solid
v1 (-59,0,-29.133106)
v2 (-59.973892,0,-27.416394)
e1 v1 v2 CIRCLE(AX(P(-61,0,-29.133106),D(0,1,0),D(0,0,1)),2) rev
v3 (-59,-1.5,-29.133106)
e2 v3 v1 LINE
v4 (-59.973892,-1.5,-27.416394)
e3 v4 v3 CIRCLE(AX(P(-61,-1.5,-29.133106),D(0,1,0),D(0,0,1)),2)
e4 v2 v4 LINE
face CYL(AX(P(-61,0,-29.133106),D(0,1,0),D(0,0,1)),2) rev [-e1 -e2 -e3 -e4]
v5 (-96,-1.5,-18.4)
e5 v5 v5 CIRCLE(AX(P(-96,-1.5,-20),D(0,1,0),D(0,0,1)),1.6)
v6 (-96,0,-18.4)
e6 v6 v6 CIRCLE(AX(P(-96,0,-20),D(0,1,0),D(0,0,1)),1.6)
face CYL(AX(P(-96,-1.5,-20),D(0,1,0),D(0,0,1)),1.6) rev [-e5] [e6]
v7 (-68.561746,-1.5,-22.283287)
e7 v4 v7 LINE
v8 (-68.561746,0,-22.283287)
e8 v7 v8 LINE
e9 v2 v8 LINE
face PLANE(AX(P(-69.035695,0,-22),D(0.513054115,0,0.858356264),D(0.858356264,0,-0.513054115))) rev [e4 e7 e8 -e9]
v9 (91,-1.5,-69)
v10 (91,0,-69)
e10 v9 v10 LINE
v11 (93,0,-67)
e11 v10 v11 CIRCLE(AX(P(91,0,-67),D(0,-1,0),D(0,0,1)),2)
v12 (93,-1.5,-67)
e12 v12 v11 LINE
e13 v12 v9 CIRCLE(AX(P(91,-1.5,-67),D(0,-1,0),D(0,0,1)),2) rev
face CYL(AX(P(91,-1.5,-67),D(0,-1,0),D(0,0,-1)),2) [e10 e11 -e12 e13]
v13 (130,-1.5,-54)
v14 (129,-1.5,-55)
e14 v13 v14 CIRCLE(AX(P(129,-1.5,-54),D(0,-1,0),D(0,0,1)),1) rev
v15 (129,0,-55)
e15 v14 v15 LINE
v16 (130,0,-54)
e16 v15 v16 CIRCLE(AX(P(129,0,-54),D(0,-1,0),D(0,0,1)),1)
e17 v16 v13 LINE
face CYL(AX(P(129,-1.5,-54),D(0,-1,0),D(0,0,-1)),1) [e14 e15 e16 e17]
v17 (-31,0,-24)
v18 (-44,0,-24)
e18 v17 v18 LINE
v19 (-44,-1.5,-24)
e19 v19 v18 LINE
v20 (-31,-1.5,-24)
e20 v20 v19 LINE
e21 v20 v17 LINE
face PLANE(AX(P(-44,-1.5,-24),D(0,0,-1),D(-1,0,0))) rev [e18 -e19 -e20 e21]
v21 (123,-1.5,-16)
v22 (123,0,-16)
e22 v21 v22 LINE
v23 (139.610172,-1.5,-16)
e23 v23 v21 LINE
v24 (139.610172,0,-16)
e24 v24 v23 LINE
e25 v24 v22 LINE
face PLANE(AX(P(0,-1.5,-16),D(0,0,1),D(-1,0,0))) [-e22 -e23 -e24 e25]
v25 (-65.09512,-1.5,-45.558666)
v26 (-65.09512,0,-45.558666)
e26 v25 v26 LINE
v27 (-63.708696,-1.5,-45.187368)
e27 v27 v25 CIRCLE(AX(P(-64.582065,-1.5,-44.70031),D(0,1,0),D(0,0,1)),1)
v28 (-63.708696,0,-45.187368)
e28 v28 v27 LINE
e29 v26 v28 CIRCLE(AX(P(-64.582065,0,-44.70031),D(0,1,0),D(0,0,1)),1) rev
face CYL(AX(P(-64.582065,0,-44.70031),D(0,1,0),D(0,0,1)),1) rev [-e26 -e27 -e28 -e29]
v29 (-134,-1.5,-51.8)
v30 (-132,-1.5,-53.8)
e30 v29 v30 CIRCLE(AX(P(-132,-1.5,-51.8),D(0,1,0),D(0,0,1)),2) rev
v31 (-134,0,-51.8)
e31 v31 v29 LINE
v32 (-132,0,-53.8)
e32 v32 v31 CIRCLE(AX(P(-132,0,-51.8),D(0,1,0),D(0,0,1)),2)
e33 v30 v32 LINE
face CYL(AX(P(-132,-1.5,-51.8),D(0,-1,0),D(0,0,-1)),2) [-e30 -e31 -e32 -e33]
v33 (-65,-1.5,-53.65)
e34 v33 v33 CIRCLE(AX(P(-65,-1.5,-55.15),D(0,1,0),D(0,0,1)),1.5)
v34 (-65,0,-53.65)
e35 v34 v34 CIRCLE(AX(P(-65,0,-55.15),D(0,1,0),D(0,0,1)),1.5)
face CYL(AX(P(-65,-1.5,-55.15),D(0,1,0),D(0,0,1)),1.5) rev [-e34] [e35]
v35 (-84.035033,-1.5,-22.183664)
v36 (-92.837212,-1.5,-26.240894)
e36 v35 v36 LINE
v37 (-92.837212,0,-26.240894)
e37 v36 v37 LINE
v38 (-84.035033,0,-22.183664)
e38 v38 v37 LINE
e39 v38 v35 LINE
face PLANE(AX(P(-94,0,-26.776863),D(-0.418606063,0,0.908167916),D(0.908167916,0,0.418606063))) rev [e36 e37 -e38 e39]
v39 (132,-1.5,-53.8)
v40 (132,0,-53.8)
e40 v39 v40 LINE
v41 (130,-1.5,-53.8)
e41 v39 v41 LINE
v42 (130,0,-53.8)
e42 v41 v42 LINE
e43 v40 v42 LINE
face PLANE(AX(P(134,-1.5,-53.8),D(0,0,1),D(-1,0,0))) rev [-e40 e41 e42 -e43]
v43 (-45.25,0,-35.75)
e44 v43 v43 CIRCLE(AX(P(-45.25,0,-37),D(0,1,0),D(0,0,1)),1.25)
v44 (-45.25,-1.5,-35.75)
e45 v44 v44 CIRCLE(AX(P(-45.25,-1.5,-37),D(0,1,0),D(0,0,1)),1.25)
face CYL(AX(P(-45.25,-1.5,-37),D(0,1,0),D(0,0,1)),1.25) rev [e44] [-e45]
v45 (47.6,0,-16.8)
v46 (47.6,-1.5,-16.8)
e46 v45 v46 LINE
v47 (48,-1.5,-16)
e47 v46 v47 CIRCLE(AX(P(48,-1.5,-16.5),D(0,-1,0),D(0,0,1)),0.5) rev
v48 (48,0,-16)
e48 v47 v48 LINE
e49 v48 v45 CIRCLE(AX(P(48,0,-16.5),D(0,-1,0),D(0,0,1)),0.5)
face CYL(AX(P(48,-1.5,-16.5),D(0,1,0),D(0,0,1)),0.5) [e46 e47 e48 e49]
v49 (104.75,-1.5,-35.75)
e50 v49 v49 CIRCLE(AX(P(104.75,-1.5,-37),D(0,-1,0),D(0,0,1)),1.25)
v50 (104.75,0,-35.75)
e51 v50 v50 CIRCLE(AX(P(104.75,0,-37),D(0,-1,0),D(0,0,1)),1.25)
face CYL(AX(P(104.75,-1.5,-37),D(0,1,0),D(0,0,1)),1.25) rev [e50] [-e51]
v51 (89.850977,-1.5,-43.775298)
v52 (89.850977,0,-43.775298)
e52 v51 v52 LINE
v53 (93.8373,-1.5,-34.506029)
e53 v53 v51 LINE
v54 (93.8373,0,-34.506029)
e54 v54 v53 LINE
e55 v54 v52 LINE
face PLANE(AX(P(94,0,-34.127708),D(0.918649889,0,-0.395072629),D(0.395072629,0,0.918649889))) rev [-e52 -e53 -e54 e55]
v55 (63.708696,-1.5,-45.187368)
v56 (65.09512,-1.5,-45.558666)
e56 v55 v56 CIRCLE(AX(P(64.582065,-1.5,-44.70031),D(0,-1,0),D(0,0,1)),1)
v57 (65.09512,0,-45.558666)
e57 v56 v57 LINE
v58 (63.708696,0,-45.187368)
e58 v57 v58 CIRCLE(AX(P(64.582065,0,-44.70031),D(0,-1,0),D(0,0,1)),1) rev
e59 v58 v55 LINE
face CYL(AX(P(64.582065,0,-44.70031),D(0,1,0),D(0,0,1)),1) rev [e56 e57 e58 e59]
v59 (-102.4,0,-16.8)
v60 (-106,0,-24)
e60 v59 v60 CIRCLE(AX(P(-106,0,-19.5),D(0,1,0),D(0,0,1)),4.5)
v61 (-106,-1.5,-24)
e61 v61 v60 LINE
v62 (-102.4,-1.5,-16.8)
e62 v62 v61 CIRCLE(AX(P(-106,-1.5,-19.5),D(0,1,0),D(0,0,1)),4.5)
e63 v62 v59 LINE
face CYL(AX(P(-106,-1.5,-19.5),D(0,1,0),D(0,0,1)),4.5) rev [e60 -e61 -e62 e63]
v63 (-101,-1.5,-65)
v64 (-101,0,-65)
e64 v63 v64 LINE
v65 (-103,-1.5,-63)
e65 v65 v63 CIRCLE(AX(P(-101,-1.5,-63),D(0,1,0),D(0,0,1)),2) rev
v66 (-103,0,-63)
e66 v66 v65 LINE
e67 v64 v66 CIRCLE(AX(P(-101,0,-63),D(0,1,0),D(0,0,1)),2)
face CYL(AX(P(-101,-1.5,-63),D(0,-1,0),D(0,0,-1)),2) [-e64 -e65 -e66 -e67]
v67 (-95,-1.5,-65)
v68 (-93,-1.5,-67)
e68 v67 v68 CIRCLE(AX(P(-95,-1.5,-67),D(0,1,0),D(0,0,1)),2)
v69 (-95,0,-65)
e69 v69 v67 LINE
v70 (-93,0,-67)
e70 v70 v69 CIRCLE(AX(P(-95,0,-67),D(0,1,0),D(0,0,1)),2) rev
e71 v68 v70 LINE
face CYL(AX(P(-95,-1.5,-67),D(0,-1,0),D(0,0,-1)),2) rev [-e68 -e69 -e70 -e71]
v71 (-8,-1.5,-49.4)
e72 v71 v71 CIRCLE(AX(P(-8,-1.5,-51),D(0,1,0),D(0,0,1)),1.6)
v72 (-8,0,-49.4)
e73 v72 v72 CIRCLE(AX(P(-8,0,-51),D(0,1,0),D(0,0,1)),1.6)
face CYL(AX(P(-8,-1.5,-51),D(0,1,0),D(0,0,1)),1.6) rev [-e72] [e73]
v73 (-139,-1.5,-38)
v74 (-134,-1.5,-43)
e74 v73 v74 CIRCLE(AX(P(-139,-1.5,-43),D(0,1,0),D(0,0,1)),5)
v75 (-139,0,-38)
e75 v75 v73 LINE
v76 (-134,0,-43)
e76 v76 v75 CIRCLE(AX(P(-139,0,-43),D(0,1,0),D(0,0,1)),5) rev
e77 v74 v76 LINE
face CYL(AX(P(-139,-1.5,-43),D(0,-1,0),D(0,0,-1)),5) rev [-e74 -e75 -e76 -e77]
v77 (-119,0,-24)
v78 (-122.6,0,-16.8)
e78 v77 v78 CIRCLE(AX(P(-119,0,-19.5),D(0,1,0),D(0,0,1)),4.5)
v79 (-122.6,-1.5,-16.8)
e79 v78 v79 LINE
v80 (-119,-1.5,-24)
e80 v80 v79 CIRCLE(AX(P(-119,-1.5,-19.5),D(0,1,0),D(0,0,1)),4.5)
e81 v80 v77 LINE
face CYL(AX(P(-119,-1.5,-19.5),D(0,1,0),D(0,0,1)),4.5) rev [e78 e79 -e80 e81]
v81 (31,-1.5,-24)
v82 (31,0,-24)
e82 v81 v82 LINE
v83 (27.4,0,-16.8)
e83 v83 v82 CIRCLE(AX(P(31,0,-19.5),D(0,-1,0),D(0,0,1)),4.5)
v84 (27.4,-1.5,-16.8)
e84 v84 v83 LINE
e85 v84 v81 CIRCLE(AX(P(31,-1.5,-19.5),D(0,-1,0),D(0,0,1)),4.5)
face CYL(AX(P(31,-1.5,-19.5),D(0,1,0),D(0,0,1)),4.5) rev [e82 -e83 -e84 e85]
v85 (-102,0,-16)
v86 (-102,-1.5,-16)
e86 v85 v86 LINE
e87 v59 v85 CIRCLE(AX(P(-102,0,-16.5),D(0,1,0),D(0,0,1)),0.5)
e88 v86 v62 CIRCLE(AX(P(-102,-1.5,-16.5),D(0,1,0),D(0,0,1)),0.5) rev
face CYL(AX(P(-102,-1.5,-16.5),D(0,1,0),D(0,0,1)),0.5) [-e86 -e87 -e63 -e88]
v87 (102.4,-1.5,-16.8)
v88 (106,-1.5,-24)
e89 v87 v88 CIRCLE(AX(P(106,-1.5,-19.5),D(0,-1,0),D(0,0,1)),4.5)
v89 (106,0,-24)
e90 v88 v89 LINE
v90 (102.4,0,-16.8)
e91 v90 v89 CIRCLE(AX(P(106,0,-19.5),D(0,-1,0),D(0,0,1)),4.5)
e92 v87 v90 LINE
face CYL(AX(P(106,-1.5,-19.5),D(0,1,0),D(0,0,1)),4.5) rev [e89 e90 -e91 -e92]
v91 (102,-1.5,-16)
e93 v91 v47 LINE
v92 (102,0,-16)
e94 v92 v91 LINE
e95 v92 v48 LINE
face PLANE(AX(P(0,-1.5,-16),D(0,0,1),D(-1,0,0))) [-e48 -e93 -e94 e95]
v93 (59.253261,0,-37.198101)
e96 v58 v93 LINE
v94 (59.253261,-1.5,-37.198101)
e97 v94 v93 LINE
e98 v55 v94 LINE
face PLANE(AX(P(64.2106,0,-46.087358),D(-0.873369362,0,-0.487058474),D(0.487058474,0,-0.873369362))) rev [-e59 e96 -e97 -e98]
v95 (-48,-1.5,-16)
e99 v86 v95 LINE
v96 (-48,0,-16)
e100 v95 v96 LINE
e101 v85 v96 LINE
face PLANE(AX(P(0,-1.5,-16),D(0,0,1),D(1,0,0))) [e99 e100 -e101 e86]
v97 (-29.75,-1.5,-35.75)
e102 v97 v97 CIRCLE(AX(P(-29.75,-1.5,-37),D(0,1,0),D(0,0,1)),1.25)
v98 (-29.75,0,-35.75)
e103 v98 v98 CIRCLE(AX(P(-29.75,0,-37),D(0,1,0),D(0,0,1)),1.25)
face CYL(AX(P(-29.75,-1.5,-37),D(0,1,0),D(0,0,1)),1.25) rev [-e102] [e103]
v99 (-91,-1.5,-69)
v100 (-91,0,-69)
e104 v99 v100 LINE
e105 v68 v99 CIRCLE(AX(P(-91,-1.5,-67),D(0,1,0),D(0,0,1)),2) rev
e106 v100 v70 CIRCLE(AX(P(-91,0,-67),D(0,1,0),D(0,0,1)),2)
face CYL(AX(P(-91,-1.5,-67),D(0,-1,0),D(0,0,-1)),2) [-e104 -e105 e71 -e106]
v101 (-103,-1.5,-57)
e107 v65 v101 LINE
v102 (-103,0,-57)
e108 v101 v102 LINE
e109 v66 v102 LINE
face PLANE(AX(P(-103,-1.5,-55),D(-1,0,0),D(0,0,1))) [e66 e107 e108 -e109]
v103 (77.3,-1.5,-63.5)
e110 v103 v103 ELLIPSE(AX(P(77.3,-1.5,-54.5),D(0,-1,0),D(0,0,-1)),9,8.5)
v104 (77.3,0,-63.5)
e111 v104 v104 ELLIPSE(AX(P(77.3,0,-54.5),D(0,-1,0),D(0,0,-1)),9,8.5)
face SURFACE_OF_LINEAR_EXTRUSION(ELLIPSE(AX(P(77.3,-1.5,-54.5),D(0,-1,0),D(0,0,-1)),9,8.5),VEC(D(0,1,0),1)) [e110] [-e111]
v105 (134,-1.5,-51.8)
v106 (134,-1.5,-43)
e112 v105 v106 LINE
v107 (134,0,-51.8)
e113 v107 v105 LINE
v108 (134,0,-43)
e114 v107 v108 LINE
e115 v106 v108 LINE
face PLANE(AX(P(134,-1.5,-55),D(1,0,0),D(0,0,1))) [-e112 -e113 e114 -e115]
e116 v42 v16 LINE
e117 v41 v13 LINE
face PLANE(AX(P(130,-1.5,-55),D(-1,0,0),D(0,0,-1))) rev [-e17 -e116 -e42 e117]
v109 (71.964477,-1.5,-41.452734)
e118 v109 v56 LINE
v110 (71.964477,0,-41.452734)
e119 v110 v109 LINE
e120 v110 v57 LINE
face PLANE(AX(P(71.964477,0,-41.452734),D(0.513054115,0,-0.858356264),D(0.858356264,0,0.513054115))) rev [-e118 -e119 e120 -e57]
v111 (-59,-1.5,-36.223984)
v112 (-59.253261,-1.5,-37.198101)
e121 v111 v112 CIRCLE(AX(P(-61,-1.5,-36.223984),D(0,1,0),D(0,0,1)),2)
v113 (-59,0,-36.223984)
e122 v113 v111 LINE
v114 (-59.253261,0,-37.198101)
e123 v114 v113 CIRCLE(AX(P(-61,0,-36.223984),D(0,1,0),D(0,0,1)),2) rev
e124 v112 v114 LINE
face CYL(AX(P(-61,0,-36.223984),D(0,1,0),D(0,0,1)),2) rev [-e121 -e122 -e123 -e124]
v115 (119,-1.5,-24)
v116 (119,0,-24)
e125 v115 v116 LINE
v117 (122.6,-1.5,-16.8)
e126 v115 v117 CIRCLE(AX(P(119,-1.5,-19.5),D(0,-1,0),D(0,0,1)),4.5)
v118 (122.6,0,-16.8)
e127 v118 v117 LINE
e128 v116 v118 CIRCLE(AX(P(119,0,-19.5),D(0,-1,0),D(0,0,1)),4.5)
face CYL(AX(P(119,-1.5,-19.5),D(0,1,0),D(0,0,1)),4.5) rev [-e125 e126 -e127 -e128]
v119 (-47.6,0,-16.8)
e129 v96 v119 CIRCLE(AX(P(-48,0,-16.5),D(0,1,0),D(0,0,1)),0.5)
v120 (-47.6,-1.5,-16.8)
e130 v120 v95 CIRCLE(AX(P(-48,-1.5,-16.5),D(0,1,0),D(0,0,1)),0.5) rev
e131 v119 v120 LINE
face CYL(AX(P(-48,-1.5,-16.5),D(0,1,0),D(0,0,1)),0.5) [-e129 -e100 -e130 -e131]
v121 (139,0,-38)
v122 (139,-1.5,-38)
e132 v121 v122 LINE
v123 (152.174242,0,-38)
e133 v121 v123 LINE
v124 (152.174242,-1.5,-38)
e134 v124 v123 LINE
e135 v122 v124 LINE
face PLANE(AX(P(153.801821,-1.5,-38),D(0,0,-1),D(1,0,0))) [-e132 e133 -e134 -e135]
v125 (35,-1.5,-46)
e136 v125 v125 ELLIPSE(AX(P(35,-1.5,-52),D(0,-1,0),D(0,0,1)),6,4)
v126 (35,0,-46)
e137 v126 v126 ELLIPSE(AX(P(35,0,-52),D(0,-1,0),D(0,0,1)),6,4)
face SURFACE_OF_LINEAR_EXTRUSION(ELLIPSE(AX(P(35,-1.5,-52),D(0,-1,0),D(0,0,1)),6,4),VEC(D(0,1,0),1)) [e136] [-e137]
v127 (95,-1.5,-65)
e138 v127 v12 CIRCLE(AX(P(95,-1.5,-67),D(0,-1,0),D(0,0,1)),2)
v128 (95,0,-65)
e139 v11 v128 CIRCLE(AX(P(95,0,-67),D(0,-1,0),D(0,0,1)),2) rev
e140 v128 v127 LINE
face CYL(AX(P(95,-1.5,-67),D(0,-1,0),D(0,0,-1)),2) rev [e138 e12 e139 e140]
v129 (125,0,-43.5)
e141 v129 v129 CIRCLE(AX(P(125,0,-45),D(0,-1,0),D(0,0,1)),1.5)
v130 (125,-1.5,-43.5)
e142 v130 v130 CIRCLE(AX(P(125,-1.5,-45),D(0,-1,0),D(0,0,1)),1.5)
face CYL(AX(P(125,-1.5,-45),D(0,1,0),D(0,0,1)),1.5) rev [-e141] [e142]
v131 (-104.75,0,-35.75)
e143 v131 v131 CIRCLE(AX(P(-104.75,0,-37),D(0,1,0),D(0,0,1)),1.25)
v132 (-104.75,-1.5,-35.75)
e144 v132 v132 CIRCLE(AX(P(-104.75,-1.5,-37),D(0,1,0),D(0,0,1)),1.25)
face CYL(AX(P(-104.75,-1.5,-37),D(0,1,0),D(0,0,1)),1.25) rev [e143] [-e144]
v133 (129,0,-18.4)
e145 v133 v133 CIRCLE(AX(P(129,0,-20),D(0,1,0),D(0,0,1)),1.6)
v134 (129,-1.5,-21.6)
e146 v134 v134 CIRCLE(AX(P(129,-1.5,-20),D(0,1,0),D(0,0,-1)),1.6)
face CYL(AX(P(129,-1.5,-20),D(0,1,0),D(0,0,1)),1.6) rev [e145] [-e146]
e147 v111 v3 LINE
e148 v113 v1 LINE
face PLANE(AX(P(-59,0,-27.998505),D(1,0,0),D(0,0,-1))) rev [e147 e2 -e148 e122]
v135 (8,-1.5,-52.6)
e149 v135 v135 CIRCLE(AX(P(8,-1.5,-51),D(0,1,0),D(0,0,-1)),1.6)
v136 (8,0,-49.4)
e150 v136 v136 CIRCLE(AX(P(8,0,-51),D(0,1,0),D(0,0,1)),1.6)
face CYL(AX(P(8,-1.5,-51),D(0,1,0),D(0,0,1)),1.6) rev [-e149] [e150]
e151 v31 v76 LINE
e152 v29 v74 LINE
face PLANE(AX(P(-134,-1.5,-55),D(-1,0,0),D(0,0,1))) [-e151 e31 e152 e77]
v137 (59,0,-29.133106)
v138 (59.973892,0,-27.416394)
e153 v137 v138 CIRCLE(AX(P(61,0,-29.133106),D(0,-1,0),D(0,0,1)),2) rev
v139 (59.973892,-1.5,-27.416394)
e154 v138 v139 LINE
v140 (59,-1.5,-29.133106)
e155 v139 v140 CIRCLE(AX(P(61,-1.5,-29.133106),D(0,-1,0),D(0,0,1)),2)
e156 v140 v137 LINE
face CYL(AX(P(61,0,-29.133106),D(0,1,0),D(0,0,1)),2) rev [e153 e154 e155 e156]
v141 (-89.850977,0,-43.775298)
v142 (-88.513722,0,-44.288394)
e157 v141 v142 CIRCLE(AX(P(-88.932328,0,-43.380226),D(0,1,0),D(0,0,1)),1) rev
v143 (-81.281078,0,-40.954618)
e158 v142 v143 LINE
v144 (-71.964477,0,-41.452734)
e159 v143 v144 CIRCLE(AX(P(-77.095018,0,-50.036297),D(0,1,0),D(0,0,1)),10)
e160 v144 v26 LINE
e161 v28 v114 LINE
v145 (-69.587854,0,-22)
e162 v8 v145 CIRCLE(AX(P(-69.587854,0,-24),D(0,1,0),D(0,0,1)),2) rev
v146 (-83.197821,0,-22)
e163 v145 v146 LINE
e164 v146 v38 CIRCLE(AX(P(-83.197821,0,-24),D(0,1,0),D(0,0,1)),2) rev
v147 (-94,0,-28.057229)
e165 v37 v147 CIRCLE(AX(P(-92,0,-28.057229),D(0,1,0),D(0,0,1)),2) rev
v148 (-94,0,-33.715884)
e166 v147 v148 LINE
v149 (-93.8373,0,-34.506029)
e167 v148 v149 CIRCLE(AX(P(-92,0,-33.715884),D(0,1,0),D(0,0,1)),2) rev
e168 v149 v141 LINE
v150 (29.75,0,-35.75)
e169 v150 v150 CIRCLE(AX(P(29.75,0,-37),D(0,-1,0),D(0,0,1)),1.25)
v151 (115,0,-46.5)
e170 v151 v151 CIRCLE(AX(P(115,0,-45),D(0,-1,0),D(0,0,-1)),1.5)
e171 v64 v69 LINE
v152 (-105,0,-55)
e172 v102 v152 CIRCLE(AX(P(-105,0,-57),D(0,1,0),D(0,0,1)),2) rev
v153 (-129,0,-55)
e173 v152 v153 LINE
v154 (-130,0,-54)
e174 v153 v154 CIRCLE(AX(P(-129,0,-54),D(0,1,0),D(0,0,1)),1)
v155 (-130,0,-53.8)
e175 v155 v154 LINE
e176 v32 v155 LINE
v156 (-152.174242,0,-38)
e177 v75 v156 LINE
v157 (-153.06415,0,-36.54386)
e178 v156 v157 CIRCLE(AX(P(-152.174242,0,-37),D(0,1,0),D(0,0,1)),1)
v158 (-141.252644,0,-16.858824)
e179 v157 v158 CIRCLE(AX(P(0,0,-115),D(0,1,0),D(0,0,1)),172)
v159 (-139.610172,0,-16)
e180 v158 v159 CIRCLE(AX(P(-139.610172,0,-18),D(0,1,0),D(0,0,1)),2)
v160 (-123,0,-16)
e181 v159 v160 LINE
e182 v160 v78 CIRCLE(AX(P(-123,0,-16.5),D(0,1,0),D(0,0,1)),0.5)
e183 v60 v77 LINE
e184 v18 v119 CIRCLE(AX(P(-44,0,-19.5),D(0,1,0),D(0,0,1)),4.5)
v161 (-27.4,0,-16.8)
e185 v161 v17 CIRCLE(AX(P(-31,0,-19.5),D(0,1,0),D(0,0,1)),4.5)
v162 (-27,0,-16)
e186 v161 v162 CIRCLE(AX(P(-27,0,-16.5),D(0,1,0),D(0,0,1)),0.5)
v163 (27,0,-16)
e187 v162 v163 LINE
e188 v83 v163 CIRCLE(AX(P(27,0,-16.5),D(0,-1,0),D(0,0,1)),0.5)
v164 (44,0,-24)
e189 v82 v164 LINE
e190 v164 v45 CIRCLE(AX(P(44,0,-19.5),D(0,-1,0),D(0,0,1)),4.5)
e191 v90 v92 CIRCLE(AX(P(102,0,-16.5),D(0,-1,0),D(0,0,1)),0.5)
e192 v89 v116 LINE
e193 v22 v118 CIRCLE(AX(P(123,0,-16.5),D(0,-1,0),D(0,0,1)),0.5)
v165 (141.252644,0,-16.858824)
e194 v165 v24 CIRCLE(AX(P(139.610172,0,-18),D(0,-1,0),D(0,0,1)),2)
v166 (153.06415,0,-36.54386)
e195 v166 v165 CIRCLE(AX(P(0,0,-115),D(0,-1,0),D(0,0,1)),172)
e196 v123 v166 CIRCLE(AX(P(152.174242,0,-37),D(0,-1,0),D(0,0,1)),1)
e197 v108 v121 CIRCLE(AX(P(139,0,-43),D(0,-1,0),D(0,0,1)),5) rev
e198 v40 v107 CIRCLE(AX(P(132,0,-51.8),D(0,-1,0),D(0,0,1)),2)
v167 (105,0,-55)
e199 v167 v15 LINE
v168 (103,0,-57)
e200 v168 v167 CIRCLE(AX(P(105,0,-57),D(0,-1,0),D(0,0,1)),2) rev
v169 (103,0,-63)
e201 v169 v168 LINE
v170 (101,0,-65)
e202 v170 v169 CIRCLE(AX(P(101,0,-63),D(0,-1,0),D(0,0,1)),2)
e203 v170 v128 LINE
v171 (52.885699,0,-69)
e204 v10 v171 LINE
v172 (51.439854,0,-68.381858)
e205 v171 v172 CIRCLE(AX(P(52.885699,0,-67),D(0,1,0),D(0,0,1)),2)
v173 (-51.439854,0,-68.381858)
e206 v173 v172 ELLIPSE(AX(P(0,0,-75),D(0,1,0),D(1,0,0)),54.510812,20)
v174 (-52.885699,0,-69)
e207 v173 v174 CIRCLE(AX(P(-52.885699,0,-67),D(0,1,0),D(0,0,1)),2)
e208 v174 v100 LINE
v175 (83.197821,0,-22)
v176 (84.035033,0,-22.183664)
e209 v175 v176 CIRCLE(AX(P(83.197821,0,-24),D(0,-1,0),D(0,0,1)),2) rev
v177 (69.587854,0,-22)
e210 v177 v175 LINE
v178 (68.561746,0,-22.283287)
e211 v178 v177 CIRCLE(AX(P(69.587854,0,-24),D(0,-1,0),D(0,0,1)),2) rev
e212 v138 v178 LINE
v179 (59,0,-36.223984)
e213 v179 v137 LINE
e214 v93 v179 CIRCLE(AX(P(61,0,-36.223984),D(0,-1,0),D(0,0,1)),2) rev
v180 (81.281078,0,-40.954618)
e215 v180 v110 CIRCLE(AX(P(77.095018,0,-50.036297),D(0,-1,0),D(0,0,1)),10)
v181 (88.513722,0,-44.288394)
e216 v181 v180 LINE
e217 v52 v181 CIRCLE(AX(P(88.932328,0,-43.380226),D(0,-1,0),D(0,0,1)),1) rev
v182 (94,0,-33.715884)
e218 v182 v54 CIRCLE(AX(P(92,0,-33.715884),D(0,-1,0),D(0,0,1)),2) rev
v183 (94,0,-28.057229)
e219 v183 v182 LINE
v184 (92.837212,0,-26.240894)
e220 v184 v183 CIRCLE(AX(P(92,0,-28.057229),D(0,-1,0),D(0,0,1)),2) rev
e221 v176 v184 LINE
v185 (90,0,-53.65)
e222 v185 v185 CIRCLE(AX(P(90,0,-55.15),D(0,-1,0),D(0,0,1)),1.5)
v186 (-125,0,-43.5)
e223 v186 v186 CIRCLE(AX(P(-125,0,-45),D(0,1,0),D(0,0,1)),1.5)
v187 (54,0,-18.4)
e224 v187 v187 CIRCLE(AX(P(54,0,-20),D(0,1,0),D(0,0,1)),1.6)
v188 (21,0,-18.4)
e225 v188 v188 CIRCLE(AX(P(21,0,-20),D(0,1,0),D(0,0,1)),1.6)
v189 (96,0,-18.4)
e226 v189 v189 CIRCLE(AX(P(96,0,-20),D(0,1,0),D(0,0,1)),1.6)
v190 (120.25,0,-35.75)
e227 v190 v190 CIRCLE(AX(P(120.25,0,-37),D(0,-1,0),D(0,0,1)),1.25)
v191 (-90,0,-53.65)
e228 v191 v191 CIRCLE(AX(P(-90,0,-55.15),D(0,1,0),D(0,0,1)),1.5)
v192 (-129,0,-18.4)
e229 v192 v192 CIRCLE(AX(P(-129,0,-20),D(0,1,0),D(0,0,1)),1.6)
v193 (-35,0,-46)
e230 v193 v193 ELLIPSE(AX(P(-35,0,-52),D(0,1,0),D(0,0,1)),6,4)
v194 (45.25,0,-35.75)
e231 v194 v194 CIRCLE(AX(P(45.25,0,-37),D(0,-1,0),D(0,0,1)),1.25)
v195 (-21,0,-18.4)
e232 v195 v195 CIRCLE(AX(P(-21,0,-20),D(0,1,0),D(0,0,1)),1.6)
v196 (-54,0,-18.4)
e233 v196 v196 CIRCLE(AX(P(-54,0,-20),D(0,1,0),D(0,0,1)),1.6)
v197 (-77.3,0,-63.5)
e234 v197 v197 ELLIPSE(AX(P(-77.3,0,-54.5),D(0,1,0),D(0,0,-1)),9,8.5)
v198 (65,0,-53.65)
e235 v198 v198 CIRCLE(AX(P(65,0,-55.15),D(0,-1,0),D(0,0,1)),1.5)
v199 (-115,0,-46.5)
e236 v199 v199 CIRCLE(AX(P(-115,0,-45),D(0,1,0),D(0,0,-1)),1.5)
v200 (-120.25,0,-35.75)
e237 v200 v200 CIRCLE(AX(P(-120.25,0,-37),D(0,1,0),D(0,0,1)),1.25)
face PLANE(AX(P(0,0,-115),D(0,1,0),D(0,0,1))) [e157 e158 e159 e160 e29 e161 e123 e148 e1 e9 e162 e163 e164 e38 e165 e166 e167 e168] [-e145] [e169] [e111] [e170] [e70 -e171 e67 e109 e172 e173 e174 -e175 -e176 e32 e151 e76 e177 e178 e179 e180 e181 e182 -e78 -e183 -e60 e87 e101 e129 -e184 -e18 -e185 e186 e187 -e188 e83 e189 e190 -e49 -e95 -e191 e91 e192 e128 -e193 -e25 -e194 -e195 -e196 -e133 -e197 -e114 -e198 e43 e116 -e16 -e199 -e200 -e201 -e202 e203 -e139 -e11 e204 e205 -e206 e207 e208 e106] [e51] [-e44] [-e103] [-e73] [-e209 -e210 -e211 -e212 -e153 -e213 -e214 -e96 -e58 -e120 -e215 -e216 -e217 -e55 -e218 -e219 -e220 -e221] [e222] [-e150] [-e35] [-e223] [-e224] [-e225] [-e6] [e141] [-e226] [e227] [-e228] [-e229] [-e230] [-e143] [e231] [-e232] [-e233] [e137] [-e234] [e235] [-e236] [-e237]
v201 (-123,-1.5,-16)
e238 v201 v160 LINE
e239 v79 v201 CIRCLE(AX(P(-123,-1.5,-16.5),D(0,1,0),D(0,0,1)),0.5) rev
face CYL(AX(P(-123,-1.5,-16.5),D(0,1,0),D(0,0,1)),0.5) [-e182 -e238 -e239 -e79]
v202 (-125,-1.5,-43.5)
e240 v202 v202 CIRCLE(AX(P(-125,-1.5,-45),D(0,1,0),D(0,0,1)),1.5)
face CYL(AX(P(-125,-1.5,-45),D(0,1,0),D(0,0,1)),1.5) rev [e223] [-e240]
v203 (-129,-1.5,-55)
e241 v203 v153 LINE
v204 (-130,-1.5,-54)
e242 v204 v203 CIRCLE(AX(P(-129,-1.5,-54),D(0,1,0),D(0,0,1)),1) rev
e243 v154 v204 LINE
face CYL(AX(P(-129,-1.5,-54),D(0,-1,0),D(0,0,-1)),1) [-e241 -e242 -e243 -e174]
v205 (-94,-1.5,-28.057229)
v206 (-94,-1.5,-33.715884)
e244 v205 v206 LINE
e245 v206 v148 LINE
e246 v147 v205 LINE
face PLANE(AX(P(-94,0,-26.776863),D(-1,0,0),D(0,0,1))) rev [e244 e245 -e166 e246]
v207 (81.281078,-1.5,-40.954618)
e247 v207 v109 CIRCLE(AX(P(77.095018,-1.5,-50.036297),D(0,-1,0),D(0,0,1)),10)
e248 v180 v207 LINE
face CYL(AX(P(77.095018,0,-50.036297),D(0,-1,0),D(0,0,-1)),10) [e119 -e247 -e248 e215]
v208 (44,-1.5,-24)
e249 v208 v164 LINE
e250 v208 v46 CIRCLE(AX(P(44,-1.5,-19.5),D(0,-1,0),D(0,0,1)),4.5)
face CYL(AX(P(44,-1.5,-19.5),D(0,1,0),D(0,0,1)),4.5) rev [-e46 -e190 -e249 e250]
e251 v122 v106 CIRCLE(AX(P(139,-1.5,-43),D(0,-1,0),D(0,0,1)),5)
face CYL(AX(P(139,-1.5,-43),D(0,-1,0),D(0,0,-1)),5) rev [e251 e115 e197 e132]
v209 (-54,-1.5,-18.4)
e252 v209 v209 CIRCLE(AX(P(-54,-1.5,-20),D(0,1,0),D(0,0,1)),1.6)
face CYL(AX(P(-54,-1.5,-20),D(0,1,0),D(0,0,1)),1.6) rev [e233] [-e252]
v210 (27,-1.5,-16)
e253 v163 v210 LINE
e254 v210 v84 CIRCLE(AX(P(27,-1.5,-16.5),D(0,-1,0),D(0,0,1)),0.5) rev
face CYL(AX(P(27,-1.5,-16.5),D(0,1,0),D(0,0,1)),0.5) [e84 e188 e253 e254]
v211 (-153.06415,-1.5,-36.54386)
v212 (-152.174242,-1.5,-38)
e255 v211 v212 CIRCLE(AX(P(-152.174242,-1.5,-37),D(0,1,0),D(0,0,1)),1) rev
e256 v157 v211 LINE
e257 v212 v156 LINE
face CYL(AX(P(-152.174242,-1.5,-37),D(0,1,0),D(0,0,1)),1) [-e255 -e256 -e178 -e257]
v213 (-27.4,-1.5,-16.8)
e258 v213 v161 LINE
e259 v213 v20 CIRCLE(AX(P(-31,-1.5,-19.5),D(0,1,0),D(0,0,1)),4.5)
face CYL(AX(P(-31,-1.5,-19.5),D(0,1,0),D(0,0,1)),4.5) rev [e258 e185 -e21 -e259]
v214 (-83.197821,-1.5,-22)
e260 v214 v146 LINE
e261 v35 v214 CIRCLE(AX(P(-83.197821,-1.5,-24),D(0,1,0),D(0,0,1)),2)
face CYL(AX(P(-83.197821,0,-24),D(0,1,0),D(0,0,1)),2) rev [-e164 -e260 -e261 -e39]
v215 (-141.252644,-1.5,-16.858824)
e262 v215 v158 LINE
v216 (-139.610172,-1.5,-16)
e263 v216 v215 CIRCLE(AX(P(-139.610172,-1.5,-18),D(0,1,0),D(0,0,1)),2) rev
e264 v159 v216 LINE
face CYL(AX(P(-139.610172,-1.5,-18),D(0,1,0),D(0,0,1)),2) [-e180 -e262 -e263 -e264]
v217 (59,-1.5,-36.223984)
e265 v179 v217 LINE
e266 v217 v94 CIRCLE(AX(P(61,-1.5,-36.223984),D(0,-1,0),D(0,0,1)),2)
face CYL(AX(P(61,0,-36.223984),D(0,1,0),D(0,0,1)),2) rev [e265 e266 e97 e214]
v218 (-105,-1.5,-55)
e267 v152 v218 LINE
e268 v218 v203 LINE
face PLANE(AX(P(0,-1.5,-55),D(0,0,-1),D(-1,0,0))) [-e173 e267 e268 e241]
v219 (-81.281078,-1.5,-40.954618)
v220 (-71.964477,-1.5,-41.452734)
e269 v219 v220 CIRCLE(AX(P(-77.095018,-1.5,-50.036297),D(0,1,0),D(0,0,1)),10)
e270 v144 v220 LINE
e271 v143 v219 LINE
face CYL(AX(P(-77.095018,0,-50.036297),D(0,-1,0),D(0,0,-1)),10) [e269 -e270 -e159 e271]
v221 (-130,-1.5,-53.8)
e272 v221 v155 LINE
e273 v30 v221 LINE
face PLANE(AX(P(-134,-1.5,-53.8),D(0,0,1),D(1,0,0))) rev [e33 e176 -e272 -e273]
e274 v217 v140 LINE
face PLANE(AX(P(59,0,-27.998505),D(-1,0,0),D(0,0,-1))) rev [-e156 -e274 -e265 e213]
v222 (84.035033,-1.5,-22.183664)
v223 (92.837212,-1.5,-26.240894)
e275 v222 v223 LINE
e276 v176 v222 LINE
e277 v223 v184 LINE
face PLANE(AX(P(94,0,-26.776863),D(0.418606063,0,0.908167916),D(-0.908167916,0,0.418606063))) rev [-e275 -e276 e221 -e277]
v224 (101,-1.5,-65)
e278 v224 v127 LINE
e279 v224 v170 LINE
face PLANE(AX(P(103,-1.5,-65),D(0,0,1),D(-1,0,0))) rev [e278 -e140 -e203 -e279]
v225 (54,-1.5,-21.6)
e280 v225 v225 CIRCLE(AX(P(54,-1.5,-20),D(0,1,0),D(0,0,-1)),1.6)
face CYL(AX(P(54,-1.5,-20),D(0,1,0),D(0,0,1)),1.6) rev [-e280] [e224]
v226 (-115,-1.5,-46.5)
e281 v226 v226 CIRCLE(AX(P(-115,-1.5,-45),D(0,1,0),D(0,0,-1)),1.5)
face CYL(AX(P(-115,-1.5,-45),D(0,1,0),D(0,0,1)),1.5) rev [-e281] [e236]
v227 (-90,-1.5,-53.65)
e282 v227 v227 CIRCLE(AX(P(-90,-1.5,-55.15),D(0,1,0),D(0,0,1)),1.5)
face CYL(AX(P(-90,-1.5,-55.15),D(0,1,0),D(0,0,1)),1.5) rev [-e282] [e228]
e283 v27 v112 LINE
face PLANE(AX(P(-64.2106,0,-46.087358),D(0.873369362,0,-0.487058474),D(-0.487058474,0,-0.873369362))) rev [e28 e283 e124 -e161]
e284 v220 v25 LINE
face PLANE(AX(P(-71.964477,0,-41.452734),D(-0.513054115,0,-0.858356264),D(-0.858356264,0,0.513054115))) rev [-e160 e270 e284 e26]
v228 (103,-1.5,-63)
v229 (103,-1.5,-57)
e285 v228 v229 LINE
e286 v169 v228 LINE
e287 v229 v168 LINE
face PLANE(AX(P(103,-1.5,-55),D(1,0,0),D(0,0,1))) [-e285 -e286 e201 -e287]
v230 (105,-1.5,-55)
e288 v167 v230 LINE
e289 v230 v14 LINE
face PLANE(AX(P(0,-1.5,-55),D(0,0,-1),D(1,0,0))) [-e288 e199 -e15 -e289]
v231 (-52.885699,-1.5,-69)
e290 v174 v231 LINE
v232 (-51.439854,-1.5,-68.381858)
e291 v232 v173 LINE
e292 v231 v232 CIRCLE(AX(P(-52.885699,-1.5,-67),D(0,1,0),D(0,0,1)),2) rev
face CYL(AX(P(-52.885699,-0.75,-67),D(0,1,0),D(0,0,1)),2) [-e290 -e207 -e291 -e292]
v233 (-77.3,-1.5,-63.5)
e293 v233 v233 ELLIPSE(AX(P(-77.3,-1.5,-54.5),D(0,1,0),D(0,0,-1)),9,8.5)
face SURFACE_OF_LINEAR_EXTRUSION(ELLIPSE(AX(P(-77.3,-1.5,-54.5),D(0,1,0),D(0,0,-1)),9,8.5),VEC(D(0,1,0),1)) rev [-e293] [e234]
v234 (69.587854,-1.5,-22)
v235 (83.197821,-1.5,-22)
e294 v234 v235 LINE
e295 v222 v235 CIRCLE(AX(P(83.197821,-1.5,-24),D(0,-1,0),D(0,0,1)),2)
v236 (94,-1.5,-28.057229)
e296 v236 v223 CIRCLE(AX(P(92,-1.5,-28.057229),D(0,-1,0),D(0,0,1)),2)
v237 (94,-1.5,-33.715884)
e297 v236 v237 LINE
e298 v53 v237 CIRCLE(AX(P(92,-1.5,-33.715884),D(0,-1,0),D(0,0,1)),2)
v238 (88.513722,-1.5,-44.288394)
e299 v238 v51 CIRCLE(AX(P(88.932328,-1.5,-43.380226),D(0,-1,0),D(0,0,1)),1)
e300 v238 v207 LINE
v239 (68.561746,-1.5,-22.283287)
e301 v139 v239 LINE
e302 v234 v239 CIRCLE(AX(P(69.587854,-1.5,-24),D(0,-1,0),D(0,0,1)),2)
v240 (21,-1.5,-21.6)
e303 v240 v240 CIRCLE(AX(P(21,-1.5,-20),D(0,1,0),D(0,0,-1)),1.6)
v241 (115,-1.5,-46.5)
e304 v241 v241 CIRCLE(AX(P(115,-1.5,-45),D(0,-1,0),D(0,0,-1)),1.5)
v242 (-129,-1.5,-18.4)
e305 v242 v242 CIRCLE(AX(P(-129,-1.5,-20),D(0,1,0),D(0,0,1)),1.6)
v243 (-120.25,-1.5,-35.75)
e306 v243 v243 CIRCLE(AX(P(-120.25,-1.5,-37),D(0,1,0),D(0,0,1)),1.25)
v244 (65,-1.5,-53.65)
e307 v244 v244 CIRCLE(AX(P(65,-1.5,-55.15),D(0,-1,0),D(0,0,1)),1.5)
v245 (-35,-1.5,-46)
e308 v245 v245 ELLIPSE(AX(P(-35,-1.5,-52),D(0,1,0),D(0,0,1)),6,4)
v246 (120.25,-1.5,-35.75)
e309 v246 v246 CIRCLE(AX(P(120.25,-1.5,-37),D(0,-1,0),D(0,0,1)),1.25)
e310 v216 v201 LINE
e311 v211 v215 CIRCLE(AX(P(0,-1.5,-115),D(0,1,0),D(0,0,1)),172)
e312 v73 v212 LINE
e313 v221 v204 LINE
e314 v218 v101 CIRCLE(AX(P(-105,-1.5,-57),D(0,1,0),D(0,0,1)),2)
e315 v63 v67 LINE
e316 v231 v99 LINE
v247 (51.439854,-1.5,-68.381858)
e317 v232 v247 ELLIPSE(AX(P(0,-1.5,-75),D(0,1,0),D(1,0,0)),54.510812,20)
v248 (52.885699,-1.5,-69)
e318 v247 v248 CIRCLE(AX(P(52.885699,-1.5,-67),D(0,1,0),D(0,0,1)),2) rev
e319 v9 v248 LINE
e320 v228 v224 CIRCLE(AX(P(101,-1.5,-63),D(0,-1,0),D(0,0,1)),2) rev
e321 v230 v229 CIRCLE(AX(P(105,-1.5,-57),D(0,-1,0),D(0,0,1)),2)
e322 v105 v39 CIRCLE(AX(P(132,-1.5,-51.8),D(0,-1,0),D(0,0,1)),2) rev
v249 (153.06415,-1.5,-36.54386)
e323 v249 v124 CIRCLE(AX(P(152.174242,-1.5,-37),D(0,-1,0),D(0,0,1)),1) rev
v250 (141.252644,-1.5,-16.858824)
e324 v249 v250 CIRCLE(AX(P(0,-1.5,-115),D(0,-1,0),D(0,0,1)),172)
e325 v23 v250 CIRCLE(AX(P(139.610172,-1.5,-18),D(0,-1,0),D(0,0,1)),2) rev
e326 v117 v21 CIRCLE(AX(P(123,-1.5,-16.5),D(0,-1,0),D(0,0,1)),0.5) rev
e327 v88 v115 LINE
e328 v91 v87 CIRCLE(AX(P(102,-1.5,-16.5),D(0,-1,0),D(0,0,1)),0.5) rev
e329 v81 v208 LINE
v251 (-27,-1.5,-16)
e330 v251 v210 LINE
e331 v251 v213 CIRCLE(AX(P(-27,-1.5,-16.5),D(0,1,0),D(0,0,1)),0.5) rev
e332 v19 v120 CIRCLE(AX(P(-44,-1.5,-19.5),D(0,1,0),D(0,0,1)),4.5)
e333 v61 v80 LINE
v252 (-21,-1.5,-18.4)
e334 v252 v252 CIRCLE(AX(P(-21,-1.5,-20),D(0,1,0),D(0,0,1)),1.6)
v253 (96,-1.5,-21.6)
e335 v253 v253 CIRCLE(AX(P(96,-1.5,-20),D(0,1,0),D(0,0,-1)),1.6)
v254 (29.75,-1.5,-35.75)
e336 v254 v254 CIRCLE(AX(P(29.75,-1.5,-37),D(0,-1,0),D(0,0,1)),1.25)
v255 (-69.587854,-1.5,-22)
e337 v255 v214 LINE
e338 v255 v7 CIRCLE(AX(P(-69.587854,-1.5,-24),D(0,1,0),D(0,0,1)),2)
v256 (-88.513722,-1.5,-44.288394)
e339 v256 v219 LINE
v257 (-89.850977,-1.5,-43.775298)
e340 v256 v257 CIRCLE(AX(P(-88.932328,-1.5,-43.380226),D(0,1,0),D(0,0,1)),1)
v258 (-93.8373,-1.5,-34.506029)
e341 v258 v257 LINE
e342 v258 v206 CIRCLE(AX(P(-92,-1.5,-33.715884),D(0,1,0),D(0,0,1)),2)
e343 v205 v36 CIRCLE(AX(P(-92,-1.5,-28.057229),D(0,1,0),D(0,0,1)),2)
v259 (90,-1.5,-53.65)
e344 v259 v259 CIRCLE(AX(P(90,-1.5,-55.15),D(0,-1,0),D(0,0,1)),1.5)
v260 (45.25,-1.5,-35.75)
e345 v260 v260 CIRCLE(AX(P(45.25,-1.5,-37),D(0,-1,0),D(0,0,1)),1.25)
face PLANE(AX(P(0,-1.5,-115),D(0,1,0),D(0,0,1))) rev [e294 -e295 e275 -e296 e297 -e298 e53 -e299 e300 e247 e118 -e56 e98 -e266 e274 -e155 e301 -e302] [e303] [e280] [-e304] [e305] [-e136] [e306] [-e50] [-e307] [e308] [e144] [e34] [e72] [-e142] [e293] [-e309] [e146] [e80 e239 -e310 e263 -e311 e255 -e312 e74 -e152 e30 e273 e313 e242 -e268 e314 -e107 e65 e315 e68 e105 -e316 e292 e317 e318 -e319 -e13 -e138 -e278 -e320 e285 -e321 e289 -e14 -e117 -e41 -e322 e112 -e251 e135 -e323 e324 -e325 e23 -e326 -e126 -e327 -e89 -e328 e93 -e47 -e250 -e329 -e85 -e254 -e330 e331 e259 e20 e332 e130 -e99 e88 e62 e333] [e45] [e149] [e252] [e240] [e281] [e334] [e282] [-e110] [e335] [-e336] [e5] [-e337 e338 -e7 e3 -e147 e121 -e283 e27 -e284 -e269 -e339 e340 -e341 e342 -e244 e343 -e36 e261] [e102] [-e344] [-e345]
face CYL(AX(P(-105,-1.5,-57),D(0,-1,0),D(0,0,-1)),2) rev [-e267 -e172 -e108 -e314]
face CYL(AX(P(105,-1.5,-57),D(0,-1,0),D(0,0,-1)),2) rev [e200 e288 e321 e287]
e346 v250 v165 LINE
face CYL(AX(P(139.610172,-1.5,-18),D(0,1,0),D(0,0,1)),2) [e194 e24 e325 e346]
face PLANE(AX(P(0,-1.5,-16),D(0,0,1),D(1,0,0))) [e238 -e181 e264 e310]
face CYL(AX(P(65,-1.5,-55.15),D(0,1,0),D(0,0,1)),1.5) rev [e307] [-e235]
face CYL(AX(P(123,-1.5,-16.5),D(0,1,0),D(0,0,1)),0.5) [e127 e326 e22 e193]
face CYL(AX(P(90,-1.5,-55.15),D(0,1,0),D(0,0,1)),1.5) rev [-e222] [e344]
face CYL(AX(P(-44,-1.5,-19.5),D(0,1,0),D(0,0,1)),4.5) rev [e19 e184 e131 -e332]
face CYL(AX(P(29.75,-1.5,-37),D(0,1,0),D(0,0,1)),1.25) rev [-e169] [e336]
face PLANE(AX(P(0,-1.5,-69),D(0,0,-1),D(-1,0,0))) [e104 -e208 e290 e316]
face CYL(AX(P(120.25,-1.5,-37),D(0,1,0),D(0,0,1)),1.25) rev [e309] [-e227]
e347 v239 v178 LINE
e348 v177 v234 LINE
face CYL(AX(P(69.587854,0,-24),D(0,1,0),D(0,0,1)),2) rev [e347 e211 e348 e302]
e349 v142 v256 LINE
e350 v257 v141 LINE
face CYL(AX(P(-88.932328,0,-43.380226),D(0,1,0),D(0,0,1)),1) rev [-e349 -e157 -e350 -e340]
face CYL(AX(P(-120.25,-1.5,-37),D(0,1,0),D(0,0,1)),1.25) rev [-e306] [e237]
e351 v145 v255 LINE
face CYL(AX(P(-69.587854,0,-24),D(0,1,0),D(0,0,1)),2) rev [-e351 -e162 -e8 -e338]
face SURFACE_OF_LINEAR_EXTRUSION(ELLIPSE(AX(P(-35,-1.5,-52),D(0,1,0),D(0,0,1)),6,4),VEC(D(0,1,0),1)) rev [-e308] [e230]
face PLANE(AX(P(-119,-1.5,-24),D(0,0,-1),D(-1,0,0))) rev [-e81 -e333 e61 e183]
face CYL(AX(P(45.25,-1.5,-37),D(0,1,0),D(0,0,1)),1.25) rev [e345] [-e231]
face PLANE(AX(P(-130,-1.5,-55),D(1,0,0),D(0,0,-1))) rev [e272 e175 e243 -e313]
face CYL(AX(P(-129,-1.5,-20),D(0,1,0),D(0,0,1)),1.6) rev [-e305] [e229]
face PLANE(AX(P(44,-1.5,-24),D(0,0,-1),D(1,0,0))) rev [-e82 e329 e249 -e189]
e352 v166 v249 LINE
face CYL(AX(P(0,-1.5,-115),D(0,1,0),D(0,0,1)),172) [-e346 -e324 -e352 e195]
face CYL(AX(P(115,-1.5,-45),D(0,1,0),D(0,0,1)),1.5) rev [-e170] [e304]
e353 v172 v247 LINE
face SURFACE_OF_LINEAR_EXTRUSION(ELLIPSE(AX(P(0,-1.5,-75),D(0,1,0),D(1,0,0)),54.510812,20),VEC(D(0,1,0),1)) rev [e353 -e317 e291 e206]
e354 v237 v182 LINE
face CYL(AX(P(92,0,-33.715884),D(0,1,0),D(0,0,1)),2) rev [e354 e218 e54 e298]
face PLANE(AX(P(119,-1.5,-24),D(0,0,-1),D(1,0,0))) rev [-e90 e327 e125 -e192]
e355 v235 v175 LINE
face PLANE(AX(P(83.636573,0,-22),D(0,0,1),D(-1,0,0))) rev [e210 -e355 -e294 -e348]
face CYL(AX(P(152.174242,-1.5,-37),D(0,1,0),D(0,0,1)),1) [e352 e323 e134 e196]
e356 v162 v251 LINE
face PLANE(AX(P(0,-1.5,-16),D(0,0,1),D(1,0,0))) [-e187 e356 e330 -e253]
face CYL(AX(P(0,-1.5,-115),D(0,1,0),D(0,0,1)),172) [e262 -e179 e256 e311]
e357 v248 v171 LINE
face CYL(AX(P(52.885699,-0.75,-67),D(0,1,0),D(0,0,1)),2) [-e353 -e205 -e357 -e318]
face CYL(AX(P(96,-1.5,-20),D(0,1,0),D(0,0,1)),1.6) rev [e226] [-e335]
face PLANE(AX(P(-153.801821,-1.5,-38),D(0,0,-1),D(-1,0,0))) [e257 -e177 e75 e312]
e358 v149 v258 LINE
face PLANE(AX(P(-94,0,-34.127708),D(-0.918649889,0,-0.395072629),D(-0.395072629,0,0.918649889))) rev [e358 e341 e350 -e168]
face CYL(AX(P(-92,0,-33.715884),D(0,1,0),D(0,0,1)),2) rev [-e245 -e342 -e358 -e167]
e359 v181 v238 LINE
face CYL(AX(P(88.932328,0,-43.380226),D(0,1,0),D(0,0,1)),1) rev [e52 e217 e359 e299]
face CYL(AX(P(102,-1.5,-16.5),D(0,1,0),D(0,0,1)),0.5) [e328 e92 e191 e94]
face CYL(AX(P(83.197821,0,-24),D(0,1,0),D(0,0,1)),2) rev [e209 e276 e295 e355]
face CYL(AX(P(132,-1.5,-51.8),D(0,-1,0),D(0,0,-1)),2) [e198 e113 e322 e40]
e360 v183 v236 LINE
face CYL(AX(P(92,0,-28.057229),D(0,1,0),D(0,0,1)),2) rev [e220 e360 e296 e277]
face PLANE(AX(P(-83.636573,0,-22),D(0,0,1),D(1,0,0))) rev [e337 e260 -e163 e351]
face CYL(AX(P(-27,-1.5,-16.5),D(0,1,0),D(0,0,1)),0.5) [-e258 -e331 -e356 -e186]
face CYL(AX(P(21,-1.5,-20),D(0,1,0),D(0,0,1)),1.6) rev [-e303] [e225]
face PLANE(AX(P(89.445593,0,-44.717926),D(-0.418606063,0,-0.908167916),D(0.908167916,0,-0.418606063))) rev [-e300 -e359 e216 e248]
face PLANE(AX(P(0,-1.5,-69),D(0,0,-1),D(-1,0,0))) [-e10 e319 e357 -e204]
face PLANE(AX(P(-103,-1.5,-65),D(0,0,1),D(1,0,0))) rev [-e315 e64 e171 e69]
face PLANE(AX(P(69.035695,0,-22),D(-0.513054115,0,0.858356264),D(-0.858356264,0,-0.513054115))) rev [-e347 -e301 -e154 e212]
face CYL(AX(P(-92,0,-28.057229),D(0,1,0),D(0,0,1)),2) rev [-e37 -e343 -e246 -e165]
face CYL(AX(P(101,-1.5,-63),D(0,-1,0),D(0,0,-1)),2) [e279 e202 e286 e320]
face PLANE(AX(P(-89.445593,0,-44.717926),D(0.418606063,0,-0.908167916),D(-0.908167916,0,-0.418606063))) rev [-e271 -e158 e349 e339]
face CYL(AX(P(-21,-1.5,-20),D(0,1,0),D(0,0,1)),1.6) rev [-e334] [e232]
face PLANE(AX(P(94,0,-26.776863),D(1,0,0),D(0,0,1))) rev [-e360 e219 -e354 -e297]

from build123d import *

# Parameters (mm, degrees)
T_LE_DE_BASE_PLI_E1_DEPTH = 1.5
CONG_1_R                  = 5
ESQUISSE2_W               = 103
ESQUISSE2_H               = 14
PATTE1_DEPTH              = 1.5
ESQUISSE5_R               = 1.5
ESQUISSE5_RX              = 9
ESQUISSE5_RY              = 8.5
ESQUISSE5_RX_2            = 6
ESQUISSE5_RY_2            = 4
ESQUISSE5_W               = 10
ESQUISSE5_H               = 4
ESQUISSE5_W_2             = 4
ESQUISSE5_H_2             = 1.2
ENL_V_MAT_EXTRU_1_DEPTH   = 1.5
ENL_V_MAT_EXTRU_3_DEPTH   = 169.577133681
CONG_2_R                  = 1
CONG_3_R                  = 2
ESQUISSE6_R               = 1.25
ESQUISSE6_R_2             = 1.5
ENL_V_MAT_EXTRU_2_DEPTH   = 1.5
CONG_5_R                  = 0.5
ESQUISSE11_R              = 1.6
ESQUISSE11_RX             = 54.51081151
ESQUISSE11_RY             = 20
ENL_V_MAT_EXTRU_4_DEPTH   = 169.004757327
CONG_4_R                  = 2


# Sheet-metal steps are written as plain solids
with BuildPart() as part:
    # Esquisse1 → Tôle de base pliée1 (new body)
    with BuildSketch(Plane(origin=(0, 0, 0), x_dir=(1, 0, 0), z_dir=(0, 1, 0))):
        with BuildLine():
            Line((0, 55), (-134, 55))
            Line((-134, 55), (-134, 38))
            Line((-134, 38), (-153.801820535, 38))
            ThreePointArc((-153.801820535, 38), (-147.637295096, 26.754721957), (-140.652052953, 16))
            Line((-140.652052953, 16), (0, 16))
            Line((0, 16), (0, 55))
        make_face()
    extrude(amount=-T_LE_DE_BASE_PLI_E1_DEPTH)

    # Congé1
    cong_1_edges = [part.edges().sort_by_distance(p)[0] for p in [
        (-134, -0.75, -38),
    ]]
    fillet(cong_1_edges, radius=CONG_1_R)

    # Esquisse2 → Patte1 (add)
    with BuildSketch(Plane(origin=(0, 0, 0), x_dir=(1, 0, 0), z_dir=(0, 1, 0))):
        with Locations((-51.5, 62)):
            Rectangle(ESQUISSE2_W, ESQUISSE2_H)
    extrude(amount=-PATTE1_DEPTH)

    # Esquisse5 → Enlèv. mat.-Extru.1 (cut)
    with BuildSketch(Plane(origin=(0, 0, 0), x_dir=(1, 0, 0), z_dir=(0, 1, 0))):
        with Locations(Location((-125, 45, 0), (0, 0, 270))):
            Circle(ESQUISSE5_R)
        with Locations(Location((-115, 45, 0), (0, 0, 90))):
            Circle(ESQUISSE5_R)
        with Locations(Location((-77.3, 54.5), (0, 0, 90))):
            Ellipse(ESQUISSE5_RX, ESQUISSE5_RY)
        with Locations(Location((-35, 52), (0, 0, -90))):
            Ellipse(ESQUISSE5_RX_2, ESQUISSE5_RY_2)
        with Locations((-98, 67)):
            Rectangle(ESQUISSE5_W, ESQUISSE5_H)
        with Locations((-132, 54.4)):
            Rectangle(ESQUISSE5_W_2, ESQUISSE5_H_2)
    extrude(amount=-ENL_V_MAT_EXTRU_1_DEPTH, mode=Mode.SUBTRACT)

    # Esquisse7 → Enlèv. mat.-Extru.3 (cut, through all)
    with BuildSketch(Plane.XZ.offset(1.5)):
        with BuildLine():
            Line((-94, -26.776862841), (-94, -34.127707598))
            Line((-94, -34.127707598), (-89.445593183, -44.717925725))
            Line((-89.445593183, -44.717925725), (-81.281078387, -40.954617932))
            ThreePointArc((-81.281078387, -40.954617932), (-76.561125557, -40.050559309), (-71.964476608, -41.452734458))
            Line((-71.964476608, -41.452734458), (-64.210600306, -46.087357996))
            Line((-64.210600306, -46.087357996), (-59, -36.743965137))
            Line((-59, -36.743965137), (-59, -27.99850523))
            Line((-59, -27.99850523), (-69.035694847, -22))
            Line((-69.035694847, -22), (-83.636572532, -22))
            Line((-83.636572532, -22), (-94, -26.776862841))
        make_face()
    extrude(amount=-ENL_V_MAT_EXTRU_3_DEPTH, mode=Mode.SUBTRACT)

    # Congé2
    cong_2_edges = [part.edges().sort_by_distance(p)[0] for p in [
        (-153.801820535, -0.75, -38),
        (-64.210600306, -0.75, -46.087357996),
        (-89.445593183, -0.75, -44.717925725),
        (-130, -0.75, -55),
    ]]
    fillet(cong_2_edges, radius=CONG_2_R)

    # Congé3
    cong_3_edges = [part.edges().sort_by_distance(p)[0] for p in [
        (-134, -0.75, -53.8),
        (-93, -0.75, -69),
        (-93, -0.75, -65),
        (-103, -0.75, -65),
        (-103, -0.75, -55),
        (-140.652052953, -0.75, -16),
        (-59, -0.75, -36.743965137),
        (-59, -0.75, -27.99850523),
        (-69.035694847, -0.75, -22),
        (-83.636572532, -0.75, -22),
        (-94, -0.75, -26.776862841),
        (-94, -0.75, -34.127707598),
    ]]
    fillet(cong_3_edges, radius=CONG_3_R - 0.0001)  # a hair under: the kernel refuses the full size

    # Esquisse6 → Enlèv. mat.-Extru.2 (cut)
    with BuildSketch(Plane(origin=(0, 0, 0), x_dir=(1, 0, 0), z_dir=(0, 1, 0))):
        with Locations(Location((-120.25, 37, 0), (0, 0, 270))):
            Circle(ESQUISSE6_R)
        with Locations(Location((-104.75, 37, 0), (0, 0, 270))):
            Circle(ESQUISSE6_R)
        with Locations(Location((-45.25, 37, 0), (0, 0, 270))):
            Circle(ESQUISSE6_R)
        with Locations(Location((-29.75, 37, 0), (0, 0, 270))):
            Circle(ESQUISSE6_R)
        with Locations(Location((-90, 55.15, 0), (0, 0, 270))):
            Circle(ESQUISSE6_R_2)
        with Locations(Location((-65, 55.15, 0), (0, 0, 270))):
            Circle(ESQUISSE6_R_2)
        with BuildLine():
            Line((-119, 24), (-106, 24))
            ThreePointArc((-106, 24), (-101.5, 19.5), (-106, 15))
            Line((-106, 15), (-119, 15))
            ThreePointArc((-119, 15), (-123.5, 19.5), (-119, 24))
        make_face()
        with BuildLine():
            Line((-44, 24), (-31, 24))
            ThreePointArc((-31, 24), (-26.5, 19.5), (-31, 15))
            Line((-31, 15), (-44, 15))
            ThreePointArc((-44, 15), (-48.5, 19.5), (-44, 24))
        make_face()
    extrude(amount=-ENL_V_MAT_EXTRU_2_DEPTH, mode=Mode.SUBTRACT)

    # Congé5
    cong_5_edges = [part.edges().sort_by_distance(p)[0] for p in [
        (-28.171572875, -0.75, -16),
        (-46.828427125, -0.75, -16),
        (-103.171572875, -0.75, -16),
        (-121.828427125, -0.75, -16),
    ]]
    fillet(cong_5_edges, radius=CONG_5_R)

    # Symétrie1: part across face


with BuildPart() as part_1:
    add(part.part)
    add(part.part.mirror(Plane(origin=(0, -0.75, -42.5), x_dir=(0, 0, 1), z_dir=(1, 0, 0))))

    # Esquisse11 → Enlèv. mat.-Extru.4 (cut, through all)
    with BuildSketch(Plane(origin=(0, 0, 0), x_dir=(1, 0, 0), z_dir=(0, 1, 0))):
        with Locations(Location((-8, 51, 0), (0, 0, 270))):
            Circle(ESQUISSE11_R)
        with Locations(Location((8, 51, 0), (0, 0, 270))):
            Circle(ESQUISSE11_R)
        with Locations(Location((-129, 20, 0), (0, 0, 270))):
            Circle(ESQUISSE11_R)
        with Locations(Location((-21, 20, 0), (0, 0, 270))):
            Circle(ESQUISSE11_R)
        with Locations(Location((21, 20, 0), (0, 0, 270))):
            Circle(ESQUISSE11_R)
        with Locations(Location((129, 20, 0), (0, 0, 270))):
            Circle(ESQUISSE11_R)
        with Locations(Location((-96, 20, 0), (0, 0, 270))):
            Circle(ESQUISSE11_R)
        with Locations(Location((-54, 20, 0), (0, 0, 270))):
            Circle(ESQUISSE11_R)
        with Locations(Location((54, 20, 0), (0, 0, 270))):
            Circle(ESQUISSE11_R)
        with Locations(Location((96, 20, 0), (0, 0, 270))):
            Circle(ESQUISSE11_R)
        with Locations((0, 75)):
            Ellipse(ESQUISSE11_RX, ESQUISSE11_RY)
    extrude(amount=-ENL_V_MAT_EXTRU_4_DEPTH, mode=Mode.SUBTRACT)

    # Congé4
    cong_4_edges = [part_1.edges().sort_by_distance(p)[0] for p in [
        (52, -0.75, -69),
        (-52, -0.75, -69),
    ]]
    fillet(cong_4_edges, radius=CONG_4_R)


solid = part_1.part
